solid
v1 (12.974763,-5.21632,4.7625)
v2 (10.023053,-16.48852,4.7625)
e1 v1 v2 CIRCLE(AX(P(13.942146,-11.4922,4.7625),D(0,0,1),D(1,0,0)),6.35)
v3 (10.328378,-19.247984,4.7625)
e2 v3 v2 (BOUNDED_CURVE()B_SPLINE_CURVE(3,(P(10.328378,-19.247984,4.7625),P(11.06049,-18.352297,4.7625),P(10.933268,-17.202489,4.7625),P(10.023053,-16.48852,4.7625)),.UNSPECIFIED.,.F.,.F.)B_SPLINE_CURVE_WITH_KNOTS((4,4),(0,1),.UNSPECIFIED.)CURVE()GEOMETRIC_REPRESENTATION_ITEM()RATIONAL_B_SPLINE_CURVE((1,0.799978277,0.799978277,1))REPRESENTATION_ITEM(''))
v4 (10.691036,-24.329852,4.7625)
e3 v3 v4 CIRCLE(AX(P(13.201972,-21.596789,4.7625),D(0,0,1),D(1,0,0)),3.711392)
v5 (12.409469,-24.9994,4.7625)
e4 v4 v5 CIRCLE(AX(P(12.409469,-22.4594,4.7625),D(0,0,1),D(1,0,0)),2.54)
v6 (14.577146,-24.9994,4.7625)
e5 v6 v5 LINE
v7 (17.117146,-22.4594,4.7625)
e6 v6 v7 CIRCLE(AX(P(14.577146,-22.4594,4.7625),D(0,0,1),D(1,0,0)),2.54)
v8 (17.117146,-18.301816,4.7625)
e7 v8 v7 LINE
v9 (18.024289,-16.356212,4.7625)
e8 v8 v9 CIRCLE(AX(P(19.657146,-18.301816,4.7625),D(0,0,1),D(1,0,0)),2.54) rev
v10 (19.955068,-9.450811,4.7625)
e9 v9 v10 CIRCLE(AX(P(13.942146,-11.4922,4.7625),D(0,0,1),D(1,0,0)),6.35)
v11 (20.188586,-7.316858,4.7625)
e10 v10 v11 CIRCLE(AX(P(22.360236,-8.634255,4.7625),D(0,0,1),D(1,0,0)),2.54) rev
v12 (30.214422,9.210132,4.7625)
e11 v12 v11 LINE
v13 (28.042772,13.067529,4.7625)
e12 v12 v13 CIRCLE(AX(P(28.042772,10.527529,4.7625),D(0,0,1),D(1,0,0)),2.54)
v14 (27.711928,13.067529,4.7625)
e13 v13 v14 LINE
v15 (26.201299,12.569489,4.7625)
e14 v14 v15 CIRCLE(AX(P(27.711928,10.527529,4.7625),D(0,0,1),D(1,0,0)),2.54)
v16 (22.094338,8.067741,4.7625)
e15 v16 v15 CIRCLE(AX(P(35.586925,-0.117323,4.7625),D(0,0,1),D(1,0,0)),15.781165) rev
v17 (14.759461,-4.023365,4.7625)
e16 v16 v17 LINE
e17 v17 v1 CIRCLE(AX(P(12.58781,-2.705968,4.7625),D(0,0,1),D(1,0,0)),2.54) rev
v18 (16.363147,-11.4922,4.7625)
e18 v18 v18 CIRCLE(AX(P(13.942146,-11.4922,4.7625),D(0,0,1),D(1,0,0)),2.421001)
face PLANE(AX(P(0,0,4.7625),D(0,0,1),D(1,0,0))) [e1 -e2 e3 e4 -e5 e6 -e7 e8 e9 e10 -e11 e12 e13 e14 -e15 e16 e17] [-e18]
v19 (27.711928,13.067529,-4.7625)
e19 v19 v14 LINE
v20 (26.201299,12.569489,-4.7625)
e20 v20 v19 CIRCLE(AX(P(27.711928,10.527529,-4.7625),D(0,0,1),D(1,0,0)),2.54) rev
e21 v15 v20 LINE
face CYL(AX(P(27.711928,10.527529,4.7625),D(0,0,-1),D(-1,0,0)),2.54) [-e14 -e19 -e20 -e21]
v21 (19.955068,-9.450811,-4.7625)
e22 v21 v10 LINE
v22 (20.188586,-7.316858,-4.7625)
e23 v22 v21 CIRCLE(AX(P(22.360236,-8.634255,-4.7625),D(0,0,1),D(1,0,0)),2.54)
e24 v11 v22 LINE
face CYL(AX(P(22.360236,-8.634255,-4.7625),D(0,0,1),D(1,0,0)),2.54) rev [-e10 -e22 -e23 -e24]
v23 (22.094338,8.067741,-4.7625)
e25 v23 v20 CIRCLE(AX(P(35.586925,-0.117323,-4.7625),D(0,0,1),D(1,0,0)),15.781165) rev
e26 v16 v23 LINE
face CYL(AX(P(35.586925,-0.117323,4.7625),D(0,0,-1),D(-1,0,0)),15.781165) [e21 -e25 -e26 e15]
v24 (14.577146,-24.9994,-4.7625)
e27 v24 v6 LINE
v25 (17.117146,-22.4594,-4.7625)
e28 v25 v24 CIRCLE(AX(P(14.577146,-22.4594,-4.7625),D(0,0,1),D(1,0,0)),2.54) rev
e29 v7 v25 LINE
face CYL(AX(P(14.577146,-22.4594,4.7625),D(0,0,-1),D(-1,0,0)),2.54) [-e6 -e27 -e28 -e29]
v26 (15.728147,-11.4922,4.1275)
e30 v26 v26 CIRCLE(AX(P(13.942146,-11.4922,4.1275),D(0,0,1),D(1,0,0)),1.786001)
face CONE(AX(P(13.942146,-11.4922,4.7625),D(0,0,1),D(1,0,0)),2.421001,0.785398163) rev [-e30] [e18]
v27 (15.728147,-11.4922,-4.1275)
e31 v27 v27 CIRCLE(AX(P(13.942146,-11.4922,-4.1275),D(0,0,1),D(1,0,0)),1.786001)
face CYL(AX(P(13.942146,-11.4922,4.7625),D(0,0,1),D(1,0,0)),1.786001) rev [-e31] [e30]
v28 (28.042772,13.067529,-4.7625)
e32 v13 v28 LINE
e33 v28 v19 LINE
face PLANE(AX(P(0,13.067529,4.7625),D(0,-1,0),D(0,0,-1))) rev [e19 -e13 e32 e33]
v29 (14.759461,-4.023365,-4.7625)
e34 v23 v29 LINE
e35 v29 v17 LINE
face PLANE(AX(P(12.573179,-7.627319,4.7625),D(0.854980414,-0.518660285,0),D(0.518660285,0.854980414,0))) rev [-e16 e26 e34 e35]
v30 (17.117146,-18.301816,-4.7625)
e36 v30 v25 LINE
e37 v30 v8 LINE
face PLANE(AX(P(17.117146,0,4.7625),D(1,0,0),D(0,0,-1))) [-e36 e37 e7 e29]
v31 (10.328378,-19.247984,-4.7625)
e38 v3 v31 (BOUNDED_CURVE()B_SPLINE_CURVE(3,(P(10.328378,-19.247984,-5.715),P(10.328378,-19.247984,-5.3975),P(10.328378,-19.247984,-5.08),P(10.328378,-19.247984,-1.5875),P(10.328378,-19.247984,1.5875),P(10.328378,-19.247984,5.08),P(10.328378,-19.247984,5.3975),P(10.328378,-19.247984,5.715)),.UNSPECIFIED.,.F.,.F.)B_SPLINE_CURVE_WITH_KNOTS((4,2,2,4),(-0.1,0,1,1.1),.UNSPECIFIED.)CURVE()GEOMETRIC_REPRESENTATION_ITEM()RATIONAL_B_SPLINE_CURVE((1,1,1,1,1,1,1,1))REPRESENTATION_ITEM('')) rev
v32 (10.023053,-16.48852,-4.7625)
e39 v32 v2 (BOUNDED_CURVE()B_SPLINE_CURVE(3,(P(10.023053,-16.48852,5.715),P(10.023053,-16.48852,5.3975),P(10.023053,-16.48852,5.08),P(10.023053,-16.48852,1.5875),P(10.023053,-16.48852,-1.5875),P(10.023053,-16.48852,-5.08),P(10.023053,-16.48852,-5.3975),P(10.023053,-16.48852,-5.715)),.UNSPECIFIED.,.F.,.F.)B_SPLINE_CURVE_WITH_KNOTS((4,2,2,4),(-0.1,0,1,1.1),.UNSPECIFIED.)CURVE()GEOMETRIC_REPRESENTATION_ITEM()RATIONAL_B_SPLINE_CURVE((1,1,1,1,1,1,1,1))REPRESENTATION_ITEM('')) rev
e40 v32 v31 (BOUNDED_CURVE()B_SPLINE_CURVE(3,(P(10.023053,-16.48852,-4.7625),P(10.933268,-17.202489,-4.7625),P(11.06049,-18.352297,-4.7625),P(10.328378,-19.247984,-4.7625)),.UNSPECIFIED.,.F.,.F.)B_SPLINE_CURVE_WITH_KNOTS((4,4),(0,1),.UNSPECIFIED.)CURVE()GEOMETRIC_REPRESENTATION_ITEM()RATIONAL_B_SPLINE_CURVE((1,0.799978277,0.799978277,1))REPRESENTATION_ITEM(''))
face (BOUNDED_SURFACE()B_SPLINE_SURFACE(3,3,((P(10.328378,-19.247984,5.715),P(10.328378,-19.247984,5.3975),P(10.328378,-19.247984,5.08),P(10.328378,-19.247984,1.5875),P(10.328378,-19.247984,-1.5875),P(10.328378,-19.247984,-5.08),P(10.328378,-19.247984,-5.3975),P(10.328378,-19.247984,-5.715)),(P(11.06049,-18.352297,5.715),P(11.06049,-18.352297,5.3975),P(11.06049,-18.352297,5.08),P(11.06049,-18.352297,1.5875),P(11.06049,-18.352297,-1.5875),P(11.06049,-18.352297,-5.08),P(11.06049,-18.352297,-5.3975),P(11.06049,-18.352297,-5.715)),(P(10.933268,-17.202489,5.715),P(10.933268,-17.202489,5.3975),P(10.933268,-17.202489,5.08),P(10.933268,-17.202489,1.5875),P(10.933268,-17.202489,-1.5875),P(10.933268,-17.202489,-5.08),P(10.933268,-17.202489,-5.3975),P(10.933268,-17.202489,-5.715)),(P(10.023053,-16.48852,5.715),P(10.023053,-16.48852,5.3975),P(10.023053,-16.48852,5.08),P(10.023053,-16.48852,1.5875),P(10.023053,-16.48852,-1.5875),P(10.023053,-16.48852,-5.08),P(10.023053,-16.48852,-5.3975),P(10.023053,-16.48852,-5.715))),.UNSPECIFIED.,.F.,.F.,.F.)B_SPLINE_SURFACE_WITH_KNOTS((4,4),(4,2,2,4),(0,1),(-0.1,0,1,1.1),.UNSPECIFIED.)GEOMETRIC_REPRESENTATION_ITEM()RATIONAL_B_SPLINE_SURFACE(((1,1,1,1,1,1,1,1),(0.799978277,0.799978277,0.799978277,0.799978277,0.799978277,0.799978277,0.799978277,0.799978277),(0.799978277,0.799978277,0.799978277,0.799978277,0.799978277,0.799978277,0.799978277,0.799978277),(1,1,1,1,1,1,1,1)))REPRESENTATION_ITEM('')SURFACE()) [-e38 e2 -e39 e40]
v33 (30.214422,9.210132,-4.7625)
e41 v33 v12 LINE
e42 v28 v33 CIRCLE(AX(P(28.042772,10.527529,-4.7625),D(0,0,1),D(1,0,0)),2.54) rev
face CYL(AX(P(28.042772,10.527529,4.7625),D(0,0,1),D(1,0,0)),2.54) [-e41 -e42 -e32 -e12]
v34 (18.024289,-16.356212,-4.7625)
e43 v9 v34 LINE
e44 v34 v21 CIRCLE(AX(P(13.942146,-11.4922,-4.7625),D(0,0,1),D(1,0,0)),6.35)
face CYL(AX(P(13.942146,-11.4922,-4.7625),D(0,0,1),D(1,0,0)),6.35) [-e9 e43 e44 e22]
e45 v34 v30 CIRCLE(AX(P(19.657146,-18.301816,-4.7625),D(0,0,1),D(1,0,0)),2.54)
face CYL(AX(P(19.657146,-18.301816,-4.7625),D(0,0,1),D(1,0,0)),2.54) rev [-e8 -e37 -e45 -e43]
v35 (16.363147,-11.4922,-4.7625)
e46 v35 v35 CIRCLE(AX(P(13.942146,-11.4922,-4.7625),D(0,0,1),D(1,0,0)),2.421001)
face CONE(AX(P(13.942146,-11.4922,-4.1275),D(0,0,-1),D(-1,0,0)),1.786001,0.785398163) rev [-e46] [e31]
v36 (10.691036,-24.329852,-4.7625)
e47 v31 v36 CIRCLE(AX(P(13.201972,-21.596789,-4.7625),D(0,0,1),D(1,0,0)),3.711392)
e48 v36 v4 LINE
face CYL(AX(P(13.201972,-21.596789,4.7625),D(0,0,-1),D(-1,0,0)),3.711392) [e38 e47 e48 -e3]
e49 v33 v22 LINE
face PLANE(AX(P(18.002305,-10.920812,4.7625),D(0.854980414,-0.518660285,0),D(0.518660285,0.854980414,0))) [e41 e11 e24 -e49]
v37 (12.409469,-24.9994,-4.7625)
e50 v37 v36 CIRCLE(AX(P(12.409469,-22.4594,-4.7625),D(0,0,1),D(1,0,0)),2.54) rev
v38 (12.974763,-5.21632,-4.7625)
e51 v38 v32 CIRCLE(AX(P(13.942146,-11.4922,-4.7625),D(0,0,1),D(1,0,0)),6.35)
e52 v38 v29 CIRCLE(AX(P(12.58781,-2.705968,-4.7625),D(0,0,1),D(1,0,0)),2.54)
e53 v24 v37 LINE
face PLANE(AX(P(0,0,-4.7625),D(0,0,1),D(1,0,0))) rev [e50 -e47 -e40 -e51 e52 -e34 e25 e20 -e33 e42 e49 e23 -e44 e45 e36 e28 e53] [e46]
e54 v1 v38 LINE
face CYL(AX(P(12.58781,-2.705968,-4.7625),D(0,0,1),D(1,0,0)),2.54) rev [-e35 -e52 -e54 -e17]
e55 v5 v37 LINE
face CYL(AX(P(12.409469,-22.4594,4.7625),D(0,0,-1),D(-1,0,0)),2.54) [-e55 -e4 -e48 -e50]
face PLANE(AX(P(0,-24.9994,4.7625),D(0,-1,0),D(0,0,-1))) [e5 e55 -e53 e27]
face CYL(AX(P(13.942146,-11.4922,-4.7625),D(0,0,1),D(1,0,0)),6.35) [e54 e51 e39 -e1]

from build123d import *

# Parameters (mm, degrees)
BOSS_EXTRUDE1_DEPTH = 4.7625
SKETCH2_R           = 6.35
BOSS_EXTRUDE2_DEPTH = 9.525
FILLET1_R           = 2.54
FILLET2_START       = -4.7625
FILLET2_DEPTH       = 9.525


with BuildPart() as part:
    # Sketch1 → Boss-Extrude1 (new, symmetric)
    with BuildSketch(Plane.XY):
        with BuildLine():
            ThreePointArc((22.094337813, 8.067740847), (24.226136754, 10.836108919), (26.914852205, 13.067529481))
            Line((26.914852205, 13.067529481), (32.554450869, 13.067529481))
            Line((32.554450869, 13.067529481), (17.117145822, -12.379943283))
            Line((17.117145822, -12.379943283), (17.117145822, -24.9994))
            Line((17.117145822, -24.9994), (11.719856102, -24.9994))
            ThreePointArc((11.719856102, -24.9994), (9.533586303, -22.160148794), (10.767145822, -18.795709173))
            Line((10.767145822, -18.795709173), (10.767145822, -10.604456717))
            Line((10.767145822, -10.604456717), (22.094337813, 8.067740847))
        make_face()
    extrude(amount=BOSS_EXTRUDE1_DEPTH, both=True)

    # Sketch2 → Boss-Extrude2 (add, through all)
    with BuildSketch(Plane.XY.offset(4.7625)):
        with Locations((13.942145822, -11.4922)):
            Circle(SKETCH2_R)
    extrude(amount=-BOSS_EXTRUDE2_DEPTH)

    # Sketch3 → 9/64 (0.14063) Diameter Hole1 (revolve, cut)
    with BuildSketch(Plane(origin=(13.942145822, -11.4922, 4.7625), x_dir=(0, -1, 0), z_dir=(1, 0, 0))):
        Polygon((0, 0), (0, 9.525), (2.421001, 9.525), (1.786001, 8.89), (1.786001, 0.635), (2.421001, 0), align=None)
    revolve(axis=Axis((13.942145822, -11.4922, 11.1125), (0, 0, -1)), mode=Mode.SUBTRACT)

    # Fillet1
    fillet1_edges = [part.edges().sort_by_distance(p)[0] for p in [
        (26.914852205, 13.067529481, 0),
        (32.554450869, 13.067529481, 0),
        (17.117145822, -24.9994, 0),
        (11.719856102, -24.9994, 0),
        (14.079831445, -5.143692879, 0),
        (17.117145822, -16.991461314, 0),
        (19.508957077, -8.437185686, 0),
    ]]
    fillet(fillet1_edges, radius=FILLET1_R)

    # Fillet2: read off the stored shape, not the designer's step
    # Fillet2 outline → Fillet2 (add)
    with BuildSketch(Plane.XY.offset(FILLET2_START)):
        with BuildLine():
            add(Edge.make_bspline(
                [(10.767145822, -18.017877519), (10.767145823, -17.393004157), (10.487472268, -16.852808402), (10.023052756, -16.488519599)],
                knots=[0.43435667, 0.43435667, 0.43435667, 0.43435667, 1, 1, 1, 1], degree=3, weights=[0.852569416, 0.837715519, 0.886859046, 1]))
            Line((10.767145822, -18.017877519), (10.767145822, -16.991461314))
            ThreePointArc((10.767145822, -16.991461314), (10.386196343, -16.753162203), (10.023052756, -16.488519599))
        make_face()
        with BuildLine():
            add(Edge.make_bspline(
                [(10.328377861, -19.24798429), (10.606973983, -18.907141934), (10.767145822, -18.483132326), (10.767145822, -18.017877519)],
                knots=[0, 0, 0, 0, 0.43435667, 0.43435667, 0.43435667, 0.43435667], degree=3, weights=[1, 0.91311923, 0.863975702, 0.852569416]))
            ThreePointArc((10.328377861, -19.24798429), (10.538145849, -19.01251792), (10.767145822, -18.795709173))
            Line((10.767145822, -18.795709173), (10.767145822, -18.017877519))
        make_face()
    extrude(amount=FILLET2_DEPTH)


solid = part.part
